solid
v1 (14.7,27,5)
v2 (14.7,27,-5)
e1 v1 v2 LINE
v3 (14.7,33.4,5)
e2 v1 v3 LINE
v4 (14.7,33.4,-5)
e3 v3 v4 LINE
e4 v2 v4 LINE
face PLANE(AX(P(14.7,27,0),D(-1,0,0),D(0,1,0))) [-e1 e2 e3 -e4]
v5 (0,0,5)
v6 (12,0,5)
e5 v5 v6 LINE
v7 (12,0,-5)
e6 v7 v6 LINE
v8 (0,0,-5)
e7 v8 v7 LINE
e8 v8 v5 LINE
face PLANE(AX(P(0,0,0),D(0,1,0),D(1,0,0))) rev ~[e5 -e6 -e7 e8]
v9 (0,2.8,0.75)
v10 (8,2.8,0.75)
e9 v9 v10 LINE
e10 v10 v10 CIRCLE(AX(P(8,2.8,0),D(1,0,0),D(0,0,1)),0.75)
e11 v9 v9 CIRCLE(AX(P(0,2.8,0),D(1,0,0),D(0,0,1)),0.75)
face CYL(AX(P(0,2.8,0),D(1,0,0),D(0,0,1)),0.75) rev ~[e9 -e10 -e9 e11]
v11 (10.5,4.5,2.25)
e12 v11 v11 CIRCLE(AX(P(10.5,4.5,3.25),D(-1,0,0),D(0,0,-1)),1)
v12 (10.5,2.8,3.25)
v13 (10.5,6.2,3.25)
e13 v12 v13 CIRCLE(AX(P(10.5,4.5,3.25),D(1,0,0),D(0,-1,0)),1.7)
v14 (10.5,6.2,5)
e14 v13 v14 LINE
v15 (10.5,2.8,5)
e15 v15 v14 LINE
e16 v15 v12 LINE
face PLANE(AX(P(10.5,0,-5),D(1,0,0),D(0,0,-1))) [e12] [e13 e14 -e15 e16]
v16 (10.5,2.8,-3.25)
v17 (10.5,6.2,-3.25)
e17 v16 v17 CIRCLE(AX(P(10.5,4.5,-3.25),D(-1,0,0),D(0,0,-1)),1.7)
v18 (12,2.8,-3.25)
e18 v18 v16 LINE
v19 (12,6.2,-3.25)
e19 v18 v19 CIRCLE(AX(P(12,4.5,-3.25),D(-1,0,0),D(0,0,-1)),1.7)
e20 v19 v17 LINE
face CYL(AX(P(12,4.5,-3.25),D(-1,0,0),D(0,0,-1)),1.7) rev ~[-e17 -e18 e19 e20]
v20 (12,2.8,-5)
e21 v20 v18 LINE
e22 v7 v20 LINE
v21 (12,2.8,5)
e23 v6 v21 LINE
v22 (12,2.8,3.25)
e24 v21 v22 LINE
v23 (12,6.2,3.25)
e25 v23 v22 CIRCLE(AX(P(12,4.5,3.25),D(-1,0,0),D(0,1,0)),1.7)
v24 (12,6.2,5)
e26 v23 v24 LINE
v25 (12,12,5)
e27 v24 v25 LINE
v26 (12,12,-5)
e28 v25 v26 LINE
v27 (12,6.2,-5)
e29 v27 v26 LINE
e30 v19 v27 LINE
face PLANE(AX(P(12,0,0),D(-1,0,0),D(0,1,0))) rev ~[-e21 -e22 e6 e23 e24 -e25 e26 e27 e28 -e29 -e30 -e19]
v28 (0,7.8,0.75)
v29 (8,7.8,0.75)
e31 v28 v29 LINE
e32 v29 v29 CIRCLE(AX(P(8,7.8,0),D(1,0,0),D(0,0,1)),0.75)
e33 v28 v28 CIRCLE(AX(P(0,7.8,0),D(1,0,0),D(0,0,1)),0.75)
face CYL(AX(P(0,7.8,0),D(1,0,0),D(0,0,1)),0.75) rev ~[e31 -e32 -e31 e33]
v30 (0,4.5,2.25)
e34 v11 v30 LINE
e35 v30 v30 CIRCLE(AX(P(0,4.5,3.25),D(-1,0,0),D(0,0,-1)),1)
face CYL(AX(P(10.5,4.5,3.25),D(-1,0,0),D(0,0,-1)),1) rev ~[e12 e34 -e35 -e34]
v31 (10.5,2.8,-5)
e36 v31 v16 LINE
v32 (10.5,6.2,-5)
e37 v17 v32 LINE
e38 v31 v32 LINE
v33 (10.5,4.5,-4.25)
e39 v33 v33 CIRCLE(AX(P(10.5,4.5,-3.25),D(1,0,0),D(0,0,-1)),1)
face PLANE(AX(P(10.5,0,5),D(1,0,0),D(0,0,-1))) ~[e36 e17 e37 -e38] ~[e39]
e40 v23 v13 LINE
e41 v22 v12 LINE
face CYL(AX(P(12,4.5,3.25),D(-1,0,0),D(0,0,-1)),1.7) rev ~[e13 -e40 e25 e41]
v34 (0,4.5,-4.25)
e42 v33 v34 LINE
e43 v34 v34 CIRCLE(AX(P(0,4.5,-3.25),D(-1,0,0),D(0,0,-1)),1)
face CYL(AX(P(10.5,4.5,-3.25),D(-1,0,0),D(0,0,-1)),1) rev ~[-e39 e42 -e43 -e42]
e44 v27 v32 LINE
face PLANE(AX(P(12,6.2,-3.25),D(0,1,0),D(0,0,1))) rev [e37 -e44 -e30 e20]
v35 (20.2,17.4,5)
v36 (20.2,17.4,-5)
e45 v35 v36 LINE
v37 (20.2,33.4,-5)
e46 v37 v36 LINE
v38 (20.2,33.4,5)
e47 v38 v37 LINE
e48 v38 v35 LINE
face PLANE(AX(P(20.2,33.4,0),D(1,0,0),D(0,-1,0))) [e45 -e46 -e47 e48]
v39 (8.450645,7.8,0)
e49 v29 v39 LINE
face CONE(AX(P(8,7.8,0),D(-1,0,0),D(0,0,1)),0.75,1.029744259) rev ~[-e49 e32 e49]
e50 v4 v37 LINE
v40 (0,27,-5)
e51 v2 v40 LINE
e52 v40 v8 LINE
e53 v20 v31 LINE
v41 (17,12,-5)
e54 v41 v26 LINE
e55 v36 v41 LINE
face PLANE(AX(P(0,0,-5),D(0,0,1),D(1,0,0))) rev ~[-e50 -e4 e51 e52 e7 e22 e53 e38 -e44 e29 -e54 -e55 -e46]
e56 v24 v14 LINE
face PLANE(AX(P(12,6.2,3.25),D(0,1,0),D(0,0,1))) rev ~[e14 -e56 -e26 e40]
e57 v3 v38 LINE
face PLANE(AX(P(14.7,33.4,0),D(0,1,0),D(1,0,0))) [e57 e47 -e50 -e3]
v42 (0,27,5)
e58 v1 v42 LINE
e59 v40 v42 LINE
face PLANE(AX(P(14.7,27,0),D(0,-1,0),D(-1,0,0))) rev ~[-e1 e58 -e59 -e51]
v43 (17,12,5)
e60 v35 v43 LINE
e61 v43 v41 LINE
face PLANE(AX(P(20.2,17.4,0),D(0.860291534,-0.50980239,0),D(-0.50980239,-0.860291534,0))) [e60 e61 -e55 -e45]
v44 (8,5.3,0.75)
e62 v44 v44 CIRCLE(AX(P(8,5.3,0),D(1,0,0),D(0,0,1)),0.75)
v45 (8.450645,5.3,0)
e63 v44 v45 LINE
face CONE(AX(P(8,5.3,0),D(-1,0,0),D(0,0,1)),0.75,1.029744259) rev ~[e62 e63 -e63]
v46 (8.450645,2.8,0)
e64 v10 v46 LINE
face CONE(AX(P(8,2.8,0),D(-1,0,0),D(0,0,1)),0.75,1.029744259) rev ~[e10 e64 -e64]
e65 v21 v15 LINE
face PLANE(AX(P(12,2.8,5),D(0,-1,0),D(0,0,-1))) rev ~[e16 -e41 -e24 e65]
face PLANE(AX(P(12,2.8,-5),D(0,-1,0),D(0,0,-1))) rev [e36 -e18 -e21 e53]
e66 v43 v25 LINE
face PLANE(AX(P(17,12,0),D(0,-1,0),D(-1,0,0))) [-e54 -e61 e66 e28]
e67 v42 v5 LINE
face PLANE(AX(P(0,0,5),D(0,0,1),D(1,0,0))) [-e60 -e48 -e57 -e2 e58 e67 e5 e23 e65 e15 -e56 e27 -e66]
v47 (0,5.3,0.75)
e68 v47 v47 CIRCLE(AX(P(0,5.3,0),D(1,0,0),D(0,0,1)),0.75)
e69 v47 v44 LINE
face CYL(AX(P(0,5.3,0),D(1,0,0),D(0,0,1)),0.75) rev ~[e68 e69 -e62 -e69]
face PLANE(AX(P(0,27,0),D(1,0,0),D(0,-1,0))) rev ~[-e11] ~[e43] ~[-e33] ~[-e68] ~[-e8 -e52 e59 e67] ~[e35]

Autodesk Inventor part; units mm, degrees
ref_plane "YZ Plane" through (0, 0, 0) normal (1, 0, 0) x (0, 1, 0)
ref_plane "XZ Plane" through (0, 0, 0) normal (0, 1, 0) x (-1, 0, 0)
ref_plane "XY Plane" through (0, 0, 0) normal (0, 0, 1) x (1, 0, 0)
sketch "Skizze1" plane through (0, 0, 0) normal (0, 0, 1) x (1, 0, 0)
  line L0 (0, 40.08) -> (0, -6.68) projected
  line L1 (-4.04, 0) -> (24.24, 0) projected
  line L2 (0, 0) -> (12, 0)
  line L3 (12, 0) -> (12, 12)
  line L4 (14.7, 27) -> (0, 27)
  line L5 (0, 27) -> (0, 0)
  line L6 (14.7, 27) -> (14.7, 33.4)
  line L7 (14.7, 33.4) -> (20.2, 33.4)
  line L8 (20.2, 33.4) -> (20.2, 17.4)
  line L9 (20.2, 17.4) -> (17, 12)
  line L10 (17, 12) -> (12, 12)
  dimension "d0" = 5.5
  dimension "d1" = 14.7
  dimension "d3" = 12
  dimension "d4" = 27
  dimension "d5" = 12
  dimension "d6" = 5
  dimension "d7" = 6.4
  dimension "d8" = 16
extrude "Extrusion1" add sketch "Skizze1" along normal mid plane 10
hole "Bohrung1" at (12, 4.5, 3.25) direction (-1, 0, 0) diameter 2 end up to surface counterbore diameter 3.4 counterbore depth 1.5
sketch "Skizze2" plane through (12, 0, -5) normal (1, 0, 0) x (0, 0, -1)
  circle A0 centre (-8.25, 4.5) radius 1.7 projected
  line L0 (-10, 0) -> (-10, 27) projected
  line L1 (-10, 2.8) -> (-8.25, 2.8)
  line L2 (-8.25, 2.8) -> (-8.25, 6.2)
  line L3 (-8.25, 6.2) -> (-10, 6.2)
  line L4 (-10, 6.2) -> (-10, 2.8)
  point P0 (-10, 5.3874)
  point P1 (-10, 3.6126)
extrude "Extrusion2" cut sketch "Skizze2" against normal up to surface (1.5 mm away) contours L2 A0 | A0 L1 L0 L3 picked at (-8.7614, 4.0923)
mirror "Spiegeln1" about plane through (0, 0, 0) normal (0, 0, 1) of "Bohrung1", "Extrusion2"
sketch "Skizze3" plane through (0, 0, 5) normal (-1, 0, 0) x (0, 0, 1)
  line L0 (0, 0) -> (0, 27) projected
  line L1 (0, 0) -> (-10, 0) projected
  circle A0 centre (-1.75, 4.5) radius 1 projected
  point P0 (-5, 2.8)
  point P1 (-5, 5.3)
  point P2 (-5, 7.8)
  dimension "d22" = 2.5
  dimension "d23" = 2.5
  dimension "d24" = 2.8
  dimension "d25" = 7.8
  dimension "d26" = 5
  dimension "d27" = 5.3
  dimension "d35" = 0.8
hole "Bohrung2" at (0, 2.8, 0) at (0, 5.3, 0) at (0, 7.8, 0) direction (1, 0, 0) diameter 1.5 depth 8 tip angle 118
equation "\"d23\" = d22"
properties part number "Valve_Outside"
